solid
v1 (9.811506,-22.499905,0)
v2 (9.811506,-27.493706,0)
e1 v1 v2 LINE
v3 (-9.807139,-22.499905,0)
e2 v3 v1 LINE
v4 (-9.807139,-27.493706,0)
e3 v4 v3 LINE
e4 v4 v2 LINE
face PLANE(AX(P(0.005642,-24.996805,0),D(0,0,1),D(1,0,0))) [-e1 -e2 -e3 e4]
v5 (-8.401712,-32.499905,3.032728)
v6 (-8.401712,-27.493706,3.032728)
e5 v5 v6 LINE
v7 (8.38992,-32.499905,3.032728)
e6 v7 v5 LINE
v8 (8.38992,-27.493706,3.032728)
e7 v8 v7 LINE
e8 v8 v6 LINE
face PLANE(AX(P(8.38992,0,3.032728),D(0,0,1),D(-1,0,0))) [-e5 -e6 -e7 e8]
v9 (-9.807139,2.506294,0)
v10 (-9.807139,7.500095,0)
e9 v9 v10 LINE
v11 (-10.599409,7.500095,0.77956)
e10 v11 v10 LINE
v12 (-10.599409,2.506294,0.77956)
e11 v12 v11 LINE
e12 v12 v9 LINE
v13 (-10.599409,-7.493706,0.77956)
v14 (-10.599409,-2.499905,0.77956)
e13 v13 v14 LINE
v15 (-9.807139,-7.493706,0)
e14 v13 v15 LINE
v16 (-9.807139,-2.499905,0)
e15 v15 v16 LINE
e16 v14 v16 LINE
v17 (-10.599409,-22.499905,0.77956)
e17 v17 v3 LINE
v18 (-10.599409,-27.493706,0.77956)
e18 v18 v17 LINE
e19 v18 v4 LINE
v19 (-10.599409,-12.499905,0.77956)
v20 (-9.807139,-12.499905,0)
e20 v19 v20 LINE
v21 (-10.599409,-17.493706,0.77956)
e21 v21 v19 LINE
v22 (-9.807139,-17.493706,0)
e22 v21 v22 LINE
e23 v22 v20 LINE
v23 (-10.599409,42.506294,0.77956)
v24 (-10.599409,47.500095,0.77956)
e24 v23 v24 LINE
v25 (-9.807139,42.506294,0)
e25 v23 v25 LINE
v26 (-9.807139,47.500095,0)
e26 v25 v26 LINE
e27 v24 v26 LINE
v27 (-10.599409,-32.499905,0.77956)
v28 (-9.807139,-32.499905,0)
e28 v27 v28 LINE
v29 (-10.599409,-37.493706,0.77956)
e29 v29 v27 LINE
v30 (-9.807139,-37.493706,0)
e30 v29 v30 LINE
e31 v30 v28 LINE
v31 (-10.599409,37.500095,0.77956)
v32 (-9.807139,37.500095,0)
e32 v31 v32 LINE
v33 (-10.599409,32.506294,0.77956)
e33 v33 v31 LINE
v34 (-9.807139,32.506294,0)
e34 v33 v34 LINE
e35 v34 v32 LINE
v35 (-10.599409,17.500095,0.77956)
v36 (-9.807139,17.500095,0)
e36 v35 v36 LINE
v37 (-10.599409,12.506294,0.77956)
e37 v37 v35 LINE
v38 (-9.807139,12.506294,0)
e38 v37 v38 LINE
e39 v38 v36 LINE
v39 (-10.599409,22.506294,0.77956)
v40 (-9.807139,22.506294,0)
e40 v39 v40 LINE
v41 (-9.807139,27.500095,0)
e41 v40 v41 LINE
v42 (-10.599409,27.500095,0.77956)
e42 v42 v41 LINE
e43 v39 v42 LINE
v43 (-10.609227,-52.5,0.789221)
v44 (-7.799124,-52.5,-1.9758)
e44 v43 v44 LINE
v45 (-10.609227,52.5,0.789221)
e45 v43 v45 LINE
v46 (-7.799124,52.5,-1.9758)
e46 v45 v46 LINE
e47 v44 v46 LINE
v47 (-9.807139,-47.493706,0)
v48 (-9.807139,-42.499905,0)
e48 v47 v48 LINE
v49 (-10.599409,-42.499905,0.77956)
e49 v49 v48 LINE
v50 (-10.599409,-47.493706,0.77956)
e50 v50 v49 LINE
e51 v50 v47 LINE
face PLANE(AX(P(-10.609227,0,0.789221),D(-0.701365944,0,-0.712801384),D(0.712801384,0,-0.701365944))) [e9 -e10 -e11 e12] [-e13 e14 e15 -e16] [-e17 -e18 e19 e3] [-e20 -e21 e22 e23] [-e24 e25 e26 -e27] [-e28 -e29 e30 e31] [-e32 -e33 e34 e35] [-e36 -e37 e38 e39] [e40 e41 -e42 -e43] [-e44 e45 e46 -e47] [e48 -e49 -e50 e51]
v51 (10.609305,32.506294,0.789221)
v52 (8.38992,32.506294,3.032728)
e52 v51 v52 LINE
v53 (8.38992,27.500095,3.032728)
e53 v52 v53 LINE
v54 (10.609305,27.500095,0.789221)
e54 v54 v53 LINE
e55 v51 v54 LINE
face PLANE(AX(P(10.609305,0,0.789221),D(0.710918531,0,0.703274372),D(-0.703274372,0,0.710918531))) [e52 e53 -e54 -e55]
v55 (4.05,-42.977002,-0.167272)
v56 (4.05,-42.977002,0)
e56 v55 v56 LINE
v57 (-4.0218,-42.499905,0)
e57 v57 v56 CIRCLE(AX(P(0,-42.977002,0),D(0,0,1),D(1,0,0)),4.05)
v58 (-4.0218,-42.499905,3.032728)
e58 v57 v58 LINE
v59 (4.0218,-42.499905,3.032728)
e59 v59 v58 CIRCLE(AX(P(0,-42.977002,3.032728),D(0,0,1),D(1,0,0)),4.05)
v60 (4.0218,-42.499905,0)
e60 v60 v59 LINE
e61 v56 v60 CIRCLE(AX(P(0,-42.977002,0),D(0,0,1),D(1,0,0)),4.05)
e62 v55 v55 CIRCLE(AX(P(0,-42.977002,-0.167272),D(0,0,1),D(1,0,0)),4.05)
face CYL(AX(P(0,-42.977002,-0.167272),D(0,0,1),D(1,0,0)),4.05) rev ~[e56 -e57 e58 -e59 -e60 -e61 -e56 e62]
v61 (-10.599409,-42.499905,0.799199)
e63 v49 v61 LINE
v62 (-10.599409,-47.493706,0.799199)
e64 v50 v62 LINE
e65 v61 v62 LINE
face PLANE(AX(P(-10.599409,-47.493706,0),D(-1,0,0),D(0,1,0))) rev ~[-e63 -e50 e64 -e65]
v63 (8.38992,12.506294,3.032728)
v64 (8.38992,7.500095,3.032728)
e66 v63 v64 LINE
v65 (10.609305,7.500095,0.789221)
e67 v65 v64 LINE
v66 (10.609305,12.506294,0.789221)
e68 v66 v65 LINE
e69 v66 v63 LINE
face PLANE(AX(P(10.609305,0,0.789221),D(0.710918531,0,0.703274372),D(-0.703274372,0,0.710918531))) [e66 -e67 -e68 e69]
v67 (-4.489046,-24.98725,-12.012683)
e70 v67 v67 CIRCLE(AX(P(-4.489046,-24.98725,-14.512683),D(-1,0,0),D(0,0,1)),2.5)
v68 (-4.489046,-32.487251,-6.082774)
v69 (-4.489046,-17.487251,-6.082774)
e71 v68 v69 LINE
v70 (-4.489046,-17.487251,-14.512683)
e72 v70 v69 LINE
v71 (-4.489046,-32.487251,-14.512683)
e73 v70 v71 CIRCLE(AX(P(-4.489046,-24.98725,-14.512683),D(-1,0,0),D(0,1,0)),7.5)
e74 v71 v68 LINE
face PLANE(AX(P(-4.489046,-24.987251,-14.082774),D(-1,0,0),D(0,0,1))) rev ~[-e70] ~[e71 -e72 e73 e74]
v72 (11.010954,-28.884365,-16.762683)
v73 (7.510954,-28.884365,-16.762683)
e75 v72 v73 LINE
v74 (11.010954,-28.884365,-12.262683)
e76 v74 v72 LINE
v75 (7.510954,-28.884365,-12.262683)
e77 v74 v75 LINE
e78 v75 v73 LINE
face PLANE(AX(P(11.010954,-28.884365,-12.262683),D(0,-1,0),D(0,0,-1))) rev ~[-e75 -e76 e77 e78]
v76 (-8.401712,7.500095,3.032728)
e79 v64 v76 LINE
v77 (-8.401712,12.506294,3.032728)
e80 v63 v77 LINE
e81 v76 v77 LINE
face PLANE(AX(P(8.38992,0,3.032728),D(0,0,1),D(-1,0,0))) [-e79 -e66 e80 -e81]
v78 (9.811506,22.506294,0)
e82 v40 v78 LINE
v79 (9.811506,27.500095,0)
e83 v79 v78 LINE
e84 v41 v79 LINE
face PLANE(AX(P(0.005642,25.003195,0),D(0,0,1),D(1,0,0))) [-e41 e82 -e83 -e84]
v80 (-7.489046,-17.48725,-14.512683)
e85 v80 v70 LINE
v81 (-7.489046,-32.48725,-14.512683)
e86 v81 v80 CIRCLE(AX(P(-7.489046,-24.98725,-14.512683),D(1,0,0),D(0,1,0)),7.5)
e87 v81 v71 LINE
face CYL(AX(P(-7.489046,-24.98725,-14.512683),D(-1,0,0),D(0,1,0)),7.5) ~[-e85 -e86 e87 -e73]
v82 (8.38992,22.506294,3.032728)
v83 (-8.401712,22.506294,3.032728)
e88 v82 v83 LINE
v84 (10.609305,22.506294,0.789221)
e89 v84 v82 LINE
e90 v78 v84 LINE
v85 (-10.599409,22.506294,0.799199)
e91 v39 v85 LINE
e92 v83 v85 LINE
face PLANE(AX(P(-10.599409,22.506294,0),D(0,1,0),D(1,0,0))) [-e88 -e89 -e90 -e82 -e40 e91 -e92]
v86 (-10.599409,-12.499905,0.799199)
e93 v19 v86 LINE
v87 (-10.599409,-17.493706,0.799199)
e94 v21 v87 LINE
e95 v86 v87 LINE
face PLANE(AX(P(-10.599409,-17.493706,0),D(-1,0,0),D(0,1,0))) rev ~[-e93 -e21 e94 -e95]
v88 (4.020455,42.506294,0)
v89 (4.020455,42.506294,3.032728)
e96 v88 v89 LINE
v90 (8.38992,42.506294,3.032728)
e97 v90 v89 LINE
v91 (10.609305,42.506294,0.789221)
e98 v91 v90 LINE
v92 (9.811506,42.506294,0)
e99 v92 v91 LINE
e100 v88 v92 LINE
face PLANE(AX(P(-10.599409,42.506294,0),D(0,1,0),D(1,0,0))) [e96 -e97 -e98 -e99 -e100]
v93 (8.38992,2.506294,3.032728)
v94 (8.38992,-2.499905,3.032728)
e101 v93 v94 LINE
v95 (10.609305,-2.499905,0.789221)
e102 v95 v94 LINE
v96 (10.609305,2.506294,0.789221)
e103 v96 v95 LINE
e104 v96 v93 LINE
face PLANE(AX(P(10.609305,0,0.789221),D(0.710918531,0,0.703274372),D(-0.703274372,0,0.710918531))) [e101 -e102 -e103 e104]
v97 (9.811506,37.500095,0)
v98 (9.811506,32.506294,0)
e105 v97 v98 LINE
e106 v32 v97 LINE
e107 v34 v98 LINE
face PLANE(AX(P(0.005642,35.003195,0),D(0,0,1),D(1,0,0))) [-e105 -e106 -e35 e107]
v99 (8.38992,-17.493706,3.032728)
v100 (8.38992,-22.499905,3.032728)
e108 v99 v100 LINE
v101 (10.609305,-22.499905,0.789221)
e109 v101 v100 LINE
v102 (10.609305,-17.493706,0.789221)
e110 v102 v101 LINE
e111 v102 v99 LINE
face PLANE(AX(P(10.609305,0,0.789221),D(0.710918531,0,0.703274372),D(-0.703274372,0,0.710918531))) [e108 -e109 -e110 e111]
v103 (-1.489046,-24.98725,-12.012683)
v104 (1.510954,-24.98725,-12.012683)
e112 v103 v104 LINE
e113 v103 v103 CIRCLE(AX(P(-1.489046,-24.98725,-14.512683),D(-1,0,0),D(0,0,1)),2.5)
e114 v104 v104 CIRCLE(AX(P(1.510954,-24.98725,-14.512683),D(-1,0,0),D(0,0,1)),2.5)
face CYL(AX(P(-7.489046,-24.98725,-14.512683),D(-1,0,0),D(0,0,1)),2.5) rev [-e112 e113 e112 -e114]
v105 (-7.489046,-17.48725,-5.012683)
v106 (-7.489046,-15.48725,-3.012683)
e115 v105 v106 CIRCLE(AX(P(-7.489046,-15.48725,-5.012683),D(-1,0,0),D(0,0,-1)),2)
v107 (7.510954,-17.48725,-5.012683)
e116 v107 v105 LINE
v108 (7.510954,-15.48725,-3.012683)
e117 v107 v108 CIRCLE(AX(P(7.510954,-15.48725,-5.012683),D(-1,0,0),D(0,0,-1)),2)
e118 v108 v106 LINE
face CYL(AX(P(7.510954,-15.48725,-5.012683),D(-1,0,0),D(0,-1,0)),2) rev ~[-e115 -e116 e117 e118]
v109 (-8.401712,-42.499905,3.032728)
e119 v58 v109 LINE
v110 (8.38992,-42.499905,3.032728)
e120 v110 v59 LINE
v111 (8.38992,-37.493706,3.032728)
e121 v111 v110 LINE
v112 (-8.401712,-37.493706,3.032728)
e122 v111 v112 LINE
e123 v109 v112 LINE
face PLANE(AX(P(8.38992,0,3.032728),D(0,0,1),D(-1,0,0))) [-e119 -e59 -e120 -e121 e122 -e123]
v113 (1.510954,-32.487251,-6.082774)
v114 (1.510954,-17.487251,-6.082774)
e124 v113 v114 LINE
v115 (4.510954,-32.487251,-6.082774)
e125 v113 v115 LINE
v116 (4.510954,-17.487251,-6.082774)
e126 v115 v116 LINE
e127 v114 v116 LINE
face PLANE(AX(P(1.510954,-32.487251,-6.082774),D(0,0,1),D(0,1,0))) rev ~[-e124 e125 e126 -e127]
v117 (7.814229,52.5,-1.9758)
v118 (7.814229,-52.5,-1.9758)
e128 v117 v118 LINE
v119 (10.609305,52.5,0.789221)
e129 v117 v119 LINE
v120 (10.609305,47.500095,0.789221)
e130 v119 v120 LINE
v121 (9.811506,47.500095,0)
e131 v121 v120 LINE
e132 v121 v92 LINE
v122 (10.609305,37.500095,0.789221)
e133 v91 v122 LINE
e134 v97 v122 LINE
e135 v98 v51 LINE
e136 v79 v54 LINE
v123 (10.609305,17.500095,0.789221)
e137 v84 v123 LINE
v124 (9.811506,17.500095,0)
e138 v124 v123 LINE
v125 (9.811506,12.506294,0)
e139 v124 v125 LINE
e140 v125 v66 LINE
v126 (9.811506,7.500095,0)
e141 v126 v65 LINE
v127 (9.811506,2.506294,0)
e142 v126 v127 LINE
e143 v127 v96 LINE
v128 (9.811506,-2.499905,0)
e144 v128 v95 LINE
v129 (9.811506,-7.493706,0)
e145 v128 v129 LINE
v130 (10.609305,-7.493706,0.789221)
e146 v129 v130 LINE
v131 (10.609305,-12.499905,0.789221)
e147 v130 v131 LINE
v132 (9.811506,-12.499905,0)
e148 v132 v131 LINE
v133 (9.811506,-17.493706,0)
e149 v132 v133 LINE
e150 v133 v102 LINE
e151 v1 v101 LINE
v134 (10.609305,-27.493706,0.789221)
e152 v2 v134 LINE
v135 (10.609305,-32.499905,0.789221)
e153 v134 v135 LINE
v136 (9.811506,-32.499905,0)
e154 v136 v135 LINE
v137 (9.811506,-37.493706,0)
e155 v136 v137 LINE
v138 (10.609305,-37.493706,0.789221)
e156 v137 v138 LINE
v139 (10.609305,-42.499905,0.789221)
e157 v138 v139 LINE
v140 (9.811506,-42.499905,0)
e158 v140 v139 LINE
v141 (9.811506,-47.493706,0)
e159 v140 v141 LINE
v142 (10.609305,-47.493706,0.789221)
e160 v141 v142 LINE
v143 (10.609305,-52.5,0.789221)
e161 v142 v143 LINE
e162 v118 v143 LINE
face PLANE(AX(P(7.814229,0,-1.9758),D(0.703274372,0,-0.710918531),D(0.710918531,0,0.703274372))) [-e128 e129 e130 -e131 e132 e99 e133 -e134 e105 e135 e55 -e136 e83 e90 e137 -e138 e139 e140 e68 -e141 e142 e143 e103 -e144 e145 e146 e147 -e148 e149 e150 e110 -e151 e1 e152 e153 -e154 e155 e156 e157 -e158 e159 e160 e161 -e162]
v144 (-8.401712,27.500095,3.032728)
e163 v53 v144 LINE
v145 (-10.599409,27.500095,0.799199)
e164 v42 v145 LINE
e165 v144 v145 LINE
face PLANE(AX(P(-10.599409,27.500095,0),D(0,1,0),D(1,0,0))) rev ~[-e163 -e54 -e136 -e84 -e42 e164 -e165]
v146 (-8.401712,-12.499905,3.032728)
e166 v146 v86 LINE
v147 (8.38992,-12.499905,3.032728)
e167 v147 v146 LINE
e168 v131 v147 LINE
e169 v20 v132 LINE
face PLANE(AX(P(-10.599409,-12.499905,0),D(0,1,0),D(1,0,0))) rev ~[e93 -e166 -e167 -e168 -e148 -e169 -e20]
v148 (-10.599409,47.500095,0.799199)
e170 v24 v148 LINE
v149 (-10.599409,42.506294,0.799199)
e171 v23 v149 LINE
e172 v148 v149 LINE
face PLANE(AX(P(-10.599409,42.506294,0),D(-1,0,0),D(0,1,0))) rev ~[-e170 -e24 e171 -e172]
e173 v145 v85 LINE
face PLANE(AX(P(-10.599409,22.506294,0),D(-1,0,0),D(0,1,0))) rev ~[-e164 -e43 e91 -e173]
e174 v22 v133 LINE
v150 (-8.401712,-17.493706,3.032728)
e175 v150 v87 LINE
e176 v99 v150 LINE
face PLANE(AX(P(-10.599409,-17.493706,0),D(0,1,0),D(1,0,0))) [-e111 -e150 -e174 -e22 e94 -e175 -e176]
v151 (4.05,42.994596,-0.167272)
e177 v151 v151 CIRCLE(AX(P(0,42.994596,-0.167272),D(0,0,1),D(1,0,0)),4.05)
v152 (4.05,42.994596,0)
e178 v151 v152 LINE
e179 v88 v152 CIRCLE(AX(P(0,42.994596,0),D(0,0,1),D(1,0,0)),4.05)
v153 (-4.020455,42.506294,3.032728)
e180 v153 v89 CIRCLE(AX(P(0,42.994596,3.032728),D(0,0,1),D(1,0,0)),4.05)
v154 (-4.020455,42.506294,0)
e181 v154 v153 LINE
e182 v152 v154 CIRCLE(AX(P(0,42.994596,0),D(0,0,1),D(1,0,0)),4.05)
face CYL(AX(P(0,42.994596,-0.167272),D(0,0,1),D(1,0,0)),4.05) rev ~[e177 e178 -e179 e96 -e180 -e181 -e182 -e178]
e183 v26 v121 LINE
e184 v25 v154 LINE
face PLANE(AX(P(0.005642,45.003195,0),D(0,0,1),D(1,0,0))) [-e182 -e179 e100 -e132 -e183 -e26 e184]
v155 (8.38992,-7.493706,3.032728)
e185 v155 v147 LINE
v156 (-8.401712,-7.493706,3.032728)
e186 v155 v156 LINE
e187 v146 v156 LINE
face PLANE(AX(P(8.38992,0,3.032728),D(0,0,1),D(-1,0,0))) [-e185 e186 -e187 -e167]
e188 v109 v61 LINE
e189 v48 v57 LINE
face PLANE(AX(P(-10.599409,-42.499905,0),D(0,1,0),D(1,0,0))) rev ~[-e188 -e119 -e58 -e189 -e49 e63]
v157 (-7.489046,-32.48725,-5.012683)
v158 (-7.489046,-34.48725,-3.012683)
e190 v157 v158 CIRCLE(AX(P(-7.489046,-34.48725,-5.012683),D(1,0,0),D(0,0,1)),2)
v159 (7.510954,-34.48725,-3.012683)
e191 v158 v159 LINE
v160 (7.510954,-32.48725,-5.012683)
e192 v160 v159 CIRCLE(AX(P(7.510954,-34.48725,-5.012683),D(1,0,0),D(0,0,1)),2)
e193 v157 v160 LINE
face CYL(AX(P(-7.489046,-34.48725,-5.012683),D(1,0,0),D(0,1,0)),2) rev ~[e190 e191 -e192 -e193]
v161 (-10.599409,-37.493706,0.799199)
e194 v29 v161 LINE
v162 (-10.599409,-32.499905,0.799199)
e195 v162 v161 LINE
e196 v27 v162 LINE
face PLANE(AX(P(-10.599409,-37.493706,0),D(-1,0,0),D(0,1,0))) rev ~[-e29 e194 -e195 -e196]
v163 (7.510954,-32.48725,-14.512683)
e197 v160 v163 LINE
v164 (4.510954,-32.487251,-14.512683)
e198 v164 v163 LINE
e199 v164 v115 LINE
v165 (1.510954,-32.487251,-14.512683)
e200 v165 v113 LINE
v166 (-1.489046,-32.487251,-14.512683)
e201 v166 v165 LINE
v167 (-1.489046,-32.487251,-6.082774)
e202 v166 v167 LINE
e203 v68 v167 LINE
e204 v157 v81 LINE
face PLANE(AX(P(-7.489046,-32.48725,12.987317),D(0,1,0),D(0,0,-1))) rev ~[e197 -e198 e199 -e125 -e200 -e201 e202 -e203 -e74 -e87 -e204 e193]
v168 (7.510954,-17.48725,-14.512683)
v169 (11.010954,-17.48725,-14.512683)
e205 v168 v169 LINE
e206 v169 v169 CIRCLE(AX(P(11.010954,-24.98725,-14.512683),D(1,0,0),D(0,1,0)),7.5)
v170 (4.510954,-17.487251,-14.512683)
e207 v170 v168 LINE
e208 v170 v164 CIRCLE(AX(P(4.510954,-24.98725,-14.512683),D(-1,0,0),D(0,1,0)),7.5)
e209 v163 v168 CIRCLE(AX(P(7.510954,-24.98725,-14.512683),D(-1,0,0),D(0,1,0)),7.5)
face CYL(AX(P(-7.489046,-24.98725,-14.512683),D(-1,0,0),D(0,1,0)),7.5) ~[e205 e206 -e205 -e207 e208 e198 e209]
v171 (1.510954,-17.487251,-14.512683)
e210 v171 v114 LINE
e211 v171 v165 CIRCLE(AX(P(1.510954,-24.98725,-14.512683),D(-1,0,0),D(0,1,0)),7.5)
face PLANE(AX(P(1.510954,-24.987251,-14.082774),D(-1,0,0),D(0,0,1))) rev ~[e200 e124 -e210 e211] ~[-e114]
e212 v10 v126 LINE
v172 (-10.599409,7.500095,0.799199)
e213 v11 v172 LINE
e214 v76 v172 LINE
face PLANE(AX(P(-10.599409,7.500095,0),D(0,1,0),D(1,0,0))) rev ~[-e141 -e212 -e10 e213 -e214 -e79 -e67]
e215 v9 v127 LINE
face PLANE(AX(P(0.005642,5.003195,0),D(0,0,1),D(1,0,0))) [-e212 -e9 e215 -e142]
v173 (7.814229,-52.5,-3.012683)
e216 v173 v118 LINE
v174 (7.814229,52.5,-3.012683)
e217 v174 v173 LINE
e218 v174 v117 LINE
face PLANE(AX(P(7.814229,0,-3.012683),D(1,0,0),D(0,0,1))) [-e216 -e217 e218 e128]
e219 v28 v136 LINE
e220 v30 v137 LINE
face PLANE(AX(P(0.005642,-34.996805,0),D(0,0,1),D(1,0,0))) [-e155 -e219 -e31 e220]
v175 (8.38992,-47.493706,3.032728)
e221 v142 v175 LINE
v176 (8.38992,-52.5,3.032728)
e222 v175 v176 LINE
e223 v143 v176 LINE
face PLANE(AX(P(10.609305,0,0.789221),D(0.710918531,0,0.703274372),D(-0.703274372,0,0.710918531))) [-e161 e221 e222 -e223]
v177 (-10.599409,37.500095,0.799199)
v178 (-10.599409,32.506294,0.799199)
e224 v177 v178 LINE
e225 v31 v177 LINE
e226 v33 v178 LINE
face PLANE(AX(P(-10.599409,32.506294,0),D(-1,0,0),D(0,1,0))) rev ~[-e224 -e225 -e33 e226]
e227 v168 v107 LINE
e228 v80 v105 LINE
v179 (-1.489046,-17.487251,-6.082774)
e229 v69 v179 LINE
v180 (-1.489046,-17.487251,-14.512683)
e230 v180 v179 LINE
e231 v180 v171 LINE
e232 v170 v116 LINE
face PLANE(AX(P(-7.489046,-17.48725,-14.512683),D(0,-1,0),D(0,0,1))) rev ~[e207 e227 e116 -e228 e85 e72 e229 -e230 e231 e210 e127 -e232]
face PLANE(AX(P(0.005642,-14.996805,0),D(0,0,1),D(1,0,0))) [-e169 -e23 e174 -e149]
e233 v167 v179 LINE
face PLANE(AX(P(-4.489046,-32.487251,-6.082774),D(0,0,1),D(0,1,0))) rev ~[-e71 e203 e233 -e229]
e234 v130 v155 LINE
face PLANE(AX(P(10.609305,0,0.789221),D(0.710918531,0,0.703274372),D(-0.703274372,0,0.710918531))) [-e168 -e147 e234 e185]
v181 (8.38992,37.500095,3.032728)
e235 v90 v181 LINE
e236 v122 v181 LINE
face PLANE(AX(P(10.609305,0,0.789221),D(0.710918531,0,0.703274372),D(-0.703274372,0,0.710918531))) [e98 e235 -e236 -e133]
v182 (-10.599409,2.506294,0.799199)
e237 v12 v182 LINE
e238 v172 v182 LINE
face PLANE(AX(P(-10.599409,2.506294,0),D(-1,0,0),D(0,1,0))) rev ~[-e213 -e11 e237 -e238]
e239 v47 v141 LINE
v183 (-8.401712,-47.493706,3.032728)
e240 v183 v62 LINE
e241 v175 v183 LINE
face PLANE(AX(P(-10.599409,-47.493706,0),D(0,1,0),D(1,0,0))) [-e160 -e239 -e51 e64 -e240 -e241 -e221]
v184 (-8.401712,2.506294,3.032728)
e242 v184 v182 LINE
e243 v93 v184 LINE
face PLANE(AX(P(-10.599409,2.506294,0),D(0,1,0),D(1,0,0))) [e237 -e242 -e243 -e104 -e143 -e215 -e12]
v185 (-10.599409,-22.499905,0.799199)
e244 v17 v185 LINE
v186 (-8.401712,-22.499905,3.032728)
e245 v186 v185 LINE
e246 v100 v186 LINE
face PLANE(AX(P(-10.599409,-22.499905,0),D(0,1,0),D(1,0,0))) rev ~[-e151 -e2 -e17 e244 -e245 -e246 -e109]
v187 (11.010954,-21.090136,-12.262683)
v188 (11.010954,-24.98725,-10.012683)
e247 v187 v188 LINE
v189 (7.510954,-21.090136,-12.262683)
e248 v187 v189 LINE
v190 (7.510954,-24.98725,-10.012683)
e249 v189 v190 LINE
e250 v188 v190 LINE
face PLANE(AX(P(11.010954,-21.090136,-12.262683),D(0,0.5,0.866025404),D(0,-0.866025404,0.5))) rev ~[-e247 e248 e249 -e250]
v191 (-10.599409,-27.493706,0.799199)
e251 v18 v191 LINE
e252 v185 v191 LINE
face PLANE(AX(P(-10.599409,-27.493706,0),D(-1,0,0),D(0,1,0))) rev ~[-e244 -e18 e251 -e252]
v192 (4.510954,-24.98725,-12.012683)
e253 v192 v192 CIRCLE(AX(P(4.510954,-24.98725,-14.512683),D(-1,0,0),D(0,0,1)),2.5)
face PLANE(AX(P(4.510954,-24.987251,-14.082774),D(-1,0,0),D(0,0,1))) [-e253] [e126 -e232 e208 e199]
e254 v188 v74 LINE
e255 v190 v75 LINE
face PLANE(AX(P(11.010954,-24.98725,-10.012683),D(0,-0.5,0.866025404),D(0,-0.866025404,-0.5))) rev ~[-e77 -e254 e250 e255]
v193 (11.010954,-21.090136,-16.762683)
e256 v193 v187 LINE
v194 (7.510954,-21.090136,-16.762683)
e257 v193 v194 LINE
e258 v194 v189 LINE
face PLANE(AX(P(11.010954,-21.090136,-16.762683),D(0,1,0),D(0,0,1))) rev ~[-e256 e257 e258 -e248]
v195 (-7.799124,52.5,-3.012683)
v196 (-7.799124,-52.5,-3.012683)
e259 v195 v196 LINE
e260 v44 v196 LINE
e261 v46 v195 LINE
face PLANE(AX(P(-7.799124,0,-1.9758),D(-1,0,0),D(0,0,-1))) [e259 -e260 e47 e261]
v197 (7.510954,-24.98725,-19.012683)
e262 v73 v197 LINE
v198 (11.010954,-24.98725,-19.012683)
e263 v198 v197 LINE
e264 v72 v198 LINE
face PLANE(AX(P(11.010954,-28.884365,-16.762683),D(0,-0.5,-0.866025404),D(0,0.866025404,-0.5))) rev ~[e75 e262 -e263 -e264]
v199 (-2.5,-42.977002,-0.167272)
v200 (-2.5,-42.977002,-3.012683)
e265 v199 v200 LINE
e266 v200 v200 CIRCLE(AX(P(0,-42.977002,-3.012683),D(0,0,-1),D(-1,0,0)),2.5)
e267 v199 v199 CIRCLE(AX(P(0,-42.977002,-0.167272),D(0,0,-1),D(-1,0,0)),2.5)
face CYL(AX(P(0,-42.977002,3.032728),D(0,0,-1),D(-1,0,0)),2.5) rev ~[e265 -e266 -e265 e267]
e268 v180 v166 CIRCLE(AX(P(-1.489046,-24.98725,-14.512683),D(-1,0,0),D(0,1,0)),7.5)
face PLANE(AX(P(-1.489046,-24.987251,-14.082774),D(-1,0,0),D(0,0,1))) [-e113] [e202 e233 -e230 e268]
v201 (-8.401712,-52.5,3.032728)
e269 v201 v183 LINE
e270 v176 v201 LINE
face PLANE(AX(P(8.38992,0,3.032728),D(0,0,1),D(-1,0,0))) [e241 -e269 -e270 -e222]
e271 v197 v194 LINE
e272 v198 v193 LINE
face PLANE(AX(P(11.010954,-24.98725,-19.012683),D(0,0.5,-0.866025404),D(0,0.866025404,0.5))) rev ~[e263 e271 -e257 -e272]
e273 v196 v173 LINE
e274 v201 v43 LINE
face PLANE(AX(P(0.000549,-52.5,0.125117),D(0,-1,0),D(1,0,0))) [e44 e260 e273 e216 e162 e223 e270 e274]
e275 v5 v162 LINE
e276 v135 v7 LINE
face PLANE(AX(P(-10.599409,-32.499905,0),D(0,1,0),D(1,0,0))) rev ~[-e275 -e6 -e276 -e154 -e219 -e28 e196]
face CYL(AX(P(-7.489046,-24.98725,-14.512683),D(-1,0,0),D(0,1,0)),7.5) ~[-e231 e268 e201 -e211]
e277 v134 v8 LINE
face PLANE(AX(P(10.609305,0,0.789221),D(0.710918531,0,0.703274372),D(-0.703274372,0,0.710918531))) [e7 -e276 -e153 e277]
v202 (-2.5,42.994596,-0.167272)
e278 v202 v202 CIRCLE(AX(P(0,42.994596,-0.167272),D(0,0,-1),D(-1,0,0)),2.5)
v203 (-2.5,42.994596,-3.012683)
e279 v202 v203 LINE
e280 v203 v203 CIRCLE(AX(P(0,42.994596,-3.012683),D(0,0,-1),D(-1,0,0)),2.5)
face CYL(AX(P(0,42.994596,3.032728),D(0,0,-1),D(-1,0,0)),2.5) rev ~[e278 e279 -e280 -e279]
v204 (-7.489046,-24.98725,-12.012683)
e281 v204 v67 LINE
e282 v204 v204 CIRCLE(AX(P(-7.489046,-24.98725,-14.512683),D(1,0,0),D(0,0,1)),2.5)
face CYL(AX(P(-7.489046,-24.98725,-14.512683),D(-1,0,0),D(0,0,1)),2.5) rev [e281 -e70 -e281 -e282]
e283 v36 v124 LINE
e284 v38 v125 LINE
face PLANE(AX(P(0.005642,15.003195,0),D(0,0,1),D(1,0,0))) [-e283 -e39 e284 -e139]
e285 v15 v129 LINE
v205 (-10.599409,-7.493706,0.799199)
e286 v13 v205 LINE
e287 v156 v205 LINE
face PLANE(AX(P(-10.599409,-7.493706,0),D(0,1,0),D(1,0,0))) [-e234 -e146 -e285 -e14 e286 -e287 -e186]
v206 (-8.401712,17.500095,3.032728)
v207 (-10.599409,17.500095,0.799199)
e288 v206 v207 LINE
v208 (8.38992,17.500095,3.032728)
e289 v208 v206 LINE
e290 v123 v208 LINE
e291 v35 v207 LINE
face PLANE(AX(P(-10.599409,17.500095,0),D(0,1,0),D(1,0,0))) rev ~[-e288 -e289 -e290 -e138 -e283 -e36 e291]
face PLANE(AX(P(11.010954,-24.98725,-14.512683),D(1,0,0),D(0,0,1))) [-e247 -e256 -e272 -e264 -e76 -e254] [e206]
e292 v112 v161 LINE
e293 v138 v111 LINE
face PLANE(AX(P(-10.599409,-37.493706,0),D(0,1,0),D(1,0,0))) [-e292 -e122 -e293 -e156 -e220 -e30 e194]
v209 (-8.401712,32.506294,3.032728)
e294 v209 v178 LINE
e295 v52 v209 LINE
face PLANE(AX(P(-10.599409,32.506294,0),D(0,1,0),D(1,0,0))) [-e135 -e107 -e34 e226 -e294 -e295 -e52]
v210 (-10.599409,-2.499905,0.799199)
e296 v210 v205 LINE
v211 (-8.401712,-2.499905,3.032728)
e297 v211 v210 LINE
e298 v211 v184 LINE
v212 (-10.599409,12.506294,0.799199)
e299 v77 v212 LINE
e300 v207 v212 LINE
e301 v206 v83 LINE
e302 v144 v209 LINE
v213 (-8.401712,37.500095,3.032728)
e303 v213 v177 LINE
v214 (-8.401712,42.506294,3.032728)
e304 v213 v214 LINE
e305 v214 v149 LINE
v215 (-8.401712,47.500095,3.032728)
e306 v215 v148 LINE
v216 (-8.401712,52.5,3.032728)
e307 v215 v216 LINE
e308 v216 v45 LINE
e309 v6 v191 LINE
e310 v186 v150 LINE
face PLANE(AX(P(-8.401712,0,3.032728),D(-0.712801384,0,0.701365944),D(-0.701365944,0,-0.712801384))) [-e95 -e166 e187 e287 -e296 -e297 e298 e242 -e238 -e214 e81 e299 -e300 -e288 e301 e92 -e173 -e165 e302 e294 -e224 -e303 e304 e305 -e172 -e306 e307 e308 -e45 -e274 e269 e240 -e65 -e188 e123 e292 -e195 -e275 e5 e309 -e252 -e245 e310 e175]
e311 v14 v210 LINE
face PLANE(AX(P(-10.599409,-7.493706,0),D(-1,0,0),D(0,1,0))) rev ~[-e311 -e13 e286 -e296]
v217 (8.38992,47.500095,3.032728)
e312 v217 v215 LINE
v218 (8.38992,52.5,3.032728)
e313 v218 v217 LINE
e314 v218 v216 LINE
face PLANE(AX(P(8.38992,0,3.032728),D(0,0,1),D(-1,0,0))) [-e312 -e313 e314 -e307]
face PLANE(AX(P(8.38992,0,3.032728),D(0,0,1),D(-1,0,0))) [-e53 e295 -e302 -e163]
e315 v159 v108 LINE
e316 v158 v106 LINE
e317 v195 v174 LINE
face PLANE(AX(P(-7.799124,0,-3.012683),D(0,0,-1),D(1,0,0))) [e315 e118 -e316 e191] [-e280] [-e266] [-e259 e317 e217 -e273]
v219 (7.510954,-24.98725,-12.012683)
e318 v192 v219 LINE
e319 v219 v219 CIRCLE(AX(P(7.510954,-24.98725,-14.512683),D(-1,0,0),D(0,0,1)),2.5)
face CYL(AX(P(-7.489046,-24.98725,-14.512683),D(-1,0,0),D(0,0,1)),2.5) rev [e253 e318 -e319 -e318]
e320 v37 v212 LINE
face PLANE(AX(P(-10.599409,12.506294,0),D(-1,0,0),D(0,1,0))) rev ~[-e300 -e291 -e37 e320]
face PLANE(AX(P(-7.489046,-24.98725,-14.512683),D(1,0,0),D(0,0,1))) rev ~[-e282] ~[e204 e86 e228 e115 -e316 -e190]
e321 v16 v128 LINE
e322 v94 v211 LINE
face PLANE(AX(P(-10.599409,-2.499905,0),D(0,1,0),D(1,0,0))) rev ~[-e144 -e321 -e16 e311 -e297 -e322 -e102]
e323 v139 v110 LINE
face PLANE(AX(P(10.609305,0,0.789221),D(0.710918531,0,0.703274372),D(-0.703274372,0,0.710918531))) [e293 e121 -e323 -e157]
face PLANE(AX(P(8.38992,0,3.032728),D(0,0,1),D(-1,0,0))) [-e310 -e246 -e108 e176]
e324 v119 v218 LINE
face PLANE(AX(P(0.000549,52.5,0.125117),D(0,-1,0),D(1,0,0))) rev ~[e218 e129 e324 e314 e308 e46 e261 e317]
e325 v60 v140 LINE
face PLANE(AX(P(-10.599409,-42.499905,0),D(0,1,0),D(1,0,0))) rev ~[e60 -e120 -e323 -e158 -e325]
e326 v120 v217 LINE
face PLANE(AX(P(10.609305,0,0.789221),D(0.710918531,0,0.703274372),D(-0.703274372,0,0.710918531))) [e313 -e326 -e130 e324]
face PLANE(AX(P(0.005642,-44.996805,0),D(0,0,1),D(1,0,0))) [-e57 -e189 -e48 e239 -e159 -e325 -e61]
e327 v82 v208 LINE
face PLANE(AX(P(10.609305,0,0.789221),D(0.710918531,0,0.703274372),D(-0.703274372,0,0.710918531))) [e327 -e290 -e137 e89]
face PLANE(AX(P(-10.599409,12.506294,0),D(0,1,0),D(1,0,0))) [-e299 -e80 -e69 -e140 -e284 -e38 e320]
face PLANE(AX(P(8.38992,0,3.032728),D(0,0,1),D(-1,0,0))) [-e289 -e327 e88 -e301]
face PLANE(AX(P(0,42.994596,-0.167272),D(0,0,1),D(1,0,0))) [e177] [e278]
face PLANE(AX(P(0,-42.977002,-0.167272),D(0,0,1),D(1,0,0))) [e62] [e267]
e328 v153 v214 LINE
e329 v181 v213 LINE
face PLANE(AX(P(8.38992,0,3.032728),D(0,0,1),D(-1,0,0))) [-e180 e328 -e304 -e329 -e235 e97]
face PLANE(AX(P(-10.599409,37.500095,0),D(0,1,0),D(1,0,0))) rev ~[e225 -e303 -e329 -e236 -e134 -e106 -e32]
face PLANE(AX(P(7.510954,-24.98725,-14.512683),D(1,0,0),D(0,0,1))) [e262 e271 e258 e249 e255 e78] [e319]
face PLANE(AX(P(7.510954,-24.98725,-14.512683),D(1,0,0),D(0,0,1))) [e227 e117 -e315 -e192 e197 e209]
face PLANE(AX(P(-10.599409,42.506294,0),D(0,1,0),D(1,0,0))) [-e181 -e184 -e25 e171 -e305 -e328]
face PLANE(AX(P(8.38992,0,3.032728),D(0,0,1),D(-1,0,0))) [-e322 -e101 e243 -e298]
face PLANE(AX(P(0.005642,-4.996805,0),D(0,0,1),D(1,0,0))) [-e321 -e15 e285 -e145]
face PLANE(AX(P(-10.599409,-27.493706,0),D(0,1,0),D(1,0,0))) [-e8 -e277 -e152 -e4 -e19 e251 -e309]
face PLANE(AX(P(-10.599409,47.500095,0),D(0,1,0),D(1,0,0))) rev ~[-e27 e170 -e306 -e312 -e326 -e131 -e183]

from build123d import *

# Parameters (mm, degrees)
F1_DEPTH       = 52.5
F2_W           = 21.2101023644
F2_H           = 4.993801238
F3_DEPTH       = 5
F5_D           = 5
F5_DEPTH       = 6.1
F5_CBORE_D     = 8.1
F5_CBORE_DEPTH = 3.2
F5_TIP         = 1.5021515476
F6_D           = 5
F6_DEPTH       = 6.1
F6_CBORE_D     = 8.1
F6_CBORE_DEPTH = 3.2
F6_TIP         = 1.5021515476
F7_R           = 2.5
F8_DEPTH       = 15
F9_DEPTH       = 18.5
F11_DEPTH      = 3.5
F13_START      = -3
F12_W          = 16
F12_H          = 15
F13_DEPTH      = 3
F14_START      = -9
F14_DEPTH      = 3
F15_ANGLE      = -90
F18_W          = 25
F18_H          = 18
F19_DEPTH      = 14
F21_R          = 2


with BuildPart() as f1:
    # F0 (on Front) → F1 (new body, symmetric)
    with BuildSketch(Plane.XZ):
        Polygon((-7.7991238795, -1.9758003764), (-7.7991238795, -3.0126834754), (7.814229466, -3.0126834754), (7.814229466, -1.9758003764), (10.6093045324, 0.7892206195), (8.3899200651, 3.0327284253), (-8.4017119181, 3.0327284253), (-10.6092272326, 0.7892206195), align=None)
    extrude(amount=F1_DEPTH, both=True)

    # F2 (on Top) → F3 (cut)
    with BuildSketch(Plane.XY):
        with Locations((0.0056419522, -4.9968052143)):
            Rectangle(F2_W, F2_H)
        with Locations((0.0056419522, -14.9968052143)):
            Rectangle(F2_W, F2_H)
        with Locations((0.0056419522, -24.9968052143)):
            Rectangle(F2_W, F2_H)
        with Locations((0.0056419522, -34.9968052143)):
            Rectangle(F2_W, F2_H)
        with Locations((0.0056419522, -44.9968052143)):
            Rectangle(F2_W, F2_H)
        with Locations((0.0056419522, 5.0031947857)):
            Rectangle(F2_W, F2_H)
        with Locations((0.0056419522, 15.0031947857)):
            Rectangle(F2_W, F2_H)
        with Locations((0.0056419522, 25.0031947857)):
            Rectangle(F2_W, F2_H)
        with Locations((0.0056419522, 35.0031947857)):
            Rectangle(F2_W, F2_H)
        with Locations((0.0056419522, 45.0031947857)):
            Rectangle(F2_W, F2_H)
    extrude(amount=F3_DEPTH, mode=Mode.SUBTRACT)

    # F5
    with Locations(Plane.XY.offset(3.0327284253)):
        with Locations((0, 42.9945960641)):
            CounterBoreHole(F5_D / 2, F5_CBORE_D / 2, F5_CBORE_DEPTH, depth=F5_DEPTH)
            with Locations((0, 0, -(F5_DEPTH + F5_TIP / 2))):  # 118° drill point
                Cone(0, F5_D / 2, F5_TIP, mode=Mode.SUBTRACT)

    # F6
    with Locations(Plane.XY.offset(3.0327284253)):
        with Locations((0, -42.977001518)):
            CounterBoreHole(F6_D / 2, F6_CBORE_D / 2, F6_CBORE_DEPTH, depth=F6_DEPTH)
            with Locations((0, 0, -(F6_DEPTH + F6_TIP / 2))):  # 118° drill point
                Cone(0, F6_D / 2, F6_TIP, mode=Mode.SUBTRACT)


with BuildPart() as f8:
    # F7 (on face) → F8 (new body)
    with BuildSketch(Plane(origin=(0, 0, -3.0126834754), x_dir=(1, 0, 0), z_dir=(0, 0, -1))):
        with BuildLine():
            ThreePointArc((-106.589045567, 38.187250495), (-108.7857447081, 43.4905513539), (-114.089045567, 45.687250495))
            ThreePointArc((-114.089045567, 45.687250495), (-119.3923464259, 43.4905513539), (-121.589045567, 38.187250495))
            ThreePointArc((-121.589045567, 38.187250495), (-119.3923464259, 32.8839496361), (-114.089045567, 30.687250495))
            ThreePointArc((-114.089045567, 30.687250495), (-108.7857447081, 32.8839496361), (-106.589045567, 38.187250495))
        make_face()
        with Locations((-114.089045567, 38.187250495)):
            Circle(F7_R, mode=Mode.SUBTRACT)
        with BuildLine():
            Line((-86.589045567, 45.687250495), (-114.089045567, 45.687250495))
            ThreePointArc((-114.089045567, 45.687250495), (-108.7857447081, 43.4905513539), (-106.589045567, 38.187250495))
            ThreePointArc((-106.589045567, 38.187250495), (-108.7857447081, 32.8839496361), (-114.089045567, 30.687250495))
            Line((-114.089045567, 30.687250495), (-86.589045567, 30.687250495))
            Line((-86.589045567, 30.687250495), (-86.589045567, 45.687250495))
        make_face()
    extrude(amount=F8_DEPTH)

    # F7 (on face) → F9 (join)
    with BuildSketch(Plane(origin=(0, 0, -3.0126834754), x_dir=(1, 0, 0), z_dir=(0, 0, -1))):
        with BuildLine():
            ThreePointArc((-106.589045567, 38.187250495), (-108.7857447081, 43.4905513539), (-114.089045567, 45.687250495))
            ThreePointArc((-114.089045567, 45.687250495), (-119.3923464259, 43.4905513539), (-121.589045567, 38.187250495))
            ThreePointArc((-121.589045567, 38.187250495), (-119.3923464259, 32.8839496361), (-114.089045567, 30.687250495))
            ThreePointArc((-114.089045567, 30.687250495), (-108.7857447081, 32.8839496361), (-106.589045567, 38.187250495))
        make_face()
        with Locations((-114.089045567, 38.187250495)):
            Circle(F7_R, mode=Mode.SUBTRACT)
    extrude(amount=F9_DEPTH)

    # F10 (on face) → F11 (cut)
    with BuildSketch(Plane(origin=(0, 0, -21.5126834754), x_dir=(1, 0, 0), z_dir=(0, 0, -1))):
        Polygon((-111.839045567, 34.2901361779), (-109.589045567, 38.187250495), (-111.839045567, 42.084364812), (-116.339045567, 42.084364812), (-118.589045567, 38.187250495), (-116.339045567, 34.2901361779), align=None)
    extrude(amount=-F11_DEPTH, mode=Mode.SUBTRACT)

    # F12 (on face) → F13 (cut)
    with BuildSketch(Plane.XY.offset(-3.0126834754).offset(F13_START)):
        with Locations((-113.6591356158, -38.187250793)):
            Rectangle(F12_W, F12_H)
    extrude(amount=-F13_DEPTH, mode=Mode.SUBTRACT)

    # F12 (on face) → F14 (cut)
    with BuildSketch(Plane.XY.offset(-3.0126834754).offset(F14_START)):
        with Locations((-113.6591356158, -38.187250793)):
            Rectangle(F12_W, F12_H)
    extrude(amount=-F14_DEPTH, mode=Mode.SUBTRACT)


with BuildPart() as f8_1:
    # F15: moved
    add(f8.part.rotate(Axis((-86.589045567, -38.187250495, -18.0126834754), (0, 1, 0)), F15_ANGLE))


with BuildPart() as f8_2:
    # F16: moved
    add(f8_1.part.moved(Location((94.1, 0, 31))))


with BuildPart() as f8_3:
    # F17: moved
    add(f8_2.part.moved(Location((0, 13.2, 0))))

    # F18 (on face) → F19 (cut)
    with BuildSketch(Plane.XY.offset(12.9873165246)):
        with Locations((0.6974760443, -24.6108990014)):
            Rectangle(F18_W, F18_H)
    extrude(amount=-F19_DEPTH, mode=Mode.SUBTRACT)


with BuildPart() as f1_1:
    add(f1.part)

    # F20: union F8
    add(f8_3.part)

    # F21
    f21_edges = [f1_1.edges().sort_by_distance(p)[0] for p in [
        (0.010954, -32.48725, -3.012683),
        (0.010954, -17.48725, -3.012683),
    ]]
    fillet(f21_edges, radius=F21_R)


solid = f1_1.part
